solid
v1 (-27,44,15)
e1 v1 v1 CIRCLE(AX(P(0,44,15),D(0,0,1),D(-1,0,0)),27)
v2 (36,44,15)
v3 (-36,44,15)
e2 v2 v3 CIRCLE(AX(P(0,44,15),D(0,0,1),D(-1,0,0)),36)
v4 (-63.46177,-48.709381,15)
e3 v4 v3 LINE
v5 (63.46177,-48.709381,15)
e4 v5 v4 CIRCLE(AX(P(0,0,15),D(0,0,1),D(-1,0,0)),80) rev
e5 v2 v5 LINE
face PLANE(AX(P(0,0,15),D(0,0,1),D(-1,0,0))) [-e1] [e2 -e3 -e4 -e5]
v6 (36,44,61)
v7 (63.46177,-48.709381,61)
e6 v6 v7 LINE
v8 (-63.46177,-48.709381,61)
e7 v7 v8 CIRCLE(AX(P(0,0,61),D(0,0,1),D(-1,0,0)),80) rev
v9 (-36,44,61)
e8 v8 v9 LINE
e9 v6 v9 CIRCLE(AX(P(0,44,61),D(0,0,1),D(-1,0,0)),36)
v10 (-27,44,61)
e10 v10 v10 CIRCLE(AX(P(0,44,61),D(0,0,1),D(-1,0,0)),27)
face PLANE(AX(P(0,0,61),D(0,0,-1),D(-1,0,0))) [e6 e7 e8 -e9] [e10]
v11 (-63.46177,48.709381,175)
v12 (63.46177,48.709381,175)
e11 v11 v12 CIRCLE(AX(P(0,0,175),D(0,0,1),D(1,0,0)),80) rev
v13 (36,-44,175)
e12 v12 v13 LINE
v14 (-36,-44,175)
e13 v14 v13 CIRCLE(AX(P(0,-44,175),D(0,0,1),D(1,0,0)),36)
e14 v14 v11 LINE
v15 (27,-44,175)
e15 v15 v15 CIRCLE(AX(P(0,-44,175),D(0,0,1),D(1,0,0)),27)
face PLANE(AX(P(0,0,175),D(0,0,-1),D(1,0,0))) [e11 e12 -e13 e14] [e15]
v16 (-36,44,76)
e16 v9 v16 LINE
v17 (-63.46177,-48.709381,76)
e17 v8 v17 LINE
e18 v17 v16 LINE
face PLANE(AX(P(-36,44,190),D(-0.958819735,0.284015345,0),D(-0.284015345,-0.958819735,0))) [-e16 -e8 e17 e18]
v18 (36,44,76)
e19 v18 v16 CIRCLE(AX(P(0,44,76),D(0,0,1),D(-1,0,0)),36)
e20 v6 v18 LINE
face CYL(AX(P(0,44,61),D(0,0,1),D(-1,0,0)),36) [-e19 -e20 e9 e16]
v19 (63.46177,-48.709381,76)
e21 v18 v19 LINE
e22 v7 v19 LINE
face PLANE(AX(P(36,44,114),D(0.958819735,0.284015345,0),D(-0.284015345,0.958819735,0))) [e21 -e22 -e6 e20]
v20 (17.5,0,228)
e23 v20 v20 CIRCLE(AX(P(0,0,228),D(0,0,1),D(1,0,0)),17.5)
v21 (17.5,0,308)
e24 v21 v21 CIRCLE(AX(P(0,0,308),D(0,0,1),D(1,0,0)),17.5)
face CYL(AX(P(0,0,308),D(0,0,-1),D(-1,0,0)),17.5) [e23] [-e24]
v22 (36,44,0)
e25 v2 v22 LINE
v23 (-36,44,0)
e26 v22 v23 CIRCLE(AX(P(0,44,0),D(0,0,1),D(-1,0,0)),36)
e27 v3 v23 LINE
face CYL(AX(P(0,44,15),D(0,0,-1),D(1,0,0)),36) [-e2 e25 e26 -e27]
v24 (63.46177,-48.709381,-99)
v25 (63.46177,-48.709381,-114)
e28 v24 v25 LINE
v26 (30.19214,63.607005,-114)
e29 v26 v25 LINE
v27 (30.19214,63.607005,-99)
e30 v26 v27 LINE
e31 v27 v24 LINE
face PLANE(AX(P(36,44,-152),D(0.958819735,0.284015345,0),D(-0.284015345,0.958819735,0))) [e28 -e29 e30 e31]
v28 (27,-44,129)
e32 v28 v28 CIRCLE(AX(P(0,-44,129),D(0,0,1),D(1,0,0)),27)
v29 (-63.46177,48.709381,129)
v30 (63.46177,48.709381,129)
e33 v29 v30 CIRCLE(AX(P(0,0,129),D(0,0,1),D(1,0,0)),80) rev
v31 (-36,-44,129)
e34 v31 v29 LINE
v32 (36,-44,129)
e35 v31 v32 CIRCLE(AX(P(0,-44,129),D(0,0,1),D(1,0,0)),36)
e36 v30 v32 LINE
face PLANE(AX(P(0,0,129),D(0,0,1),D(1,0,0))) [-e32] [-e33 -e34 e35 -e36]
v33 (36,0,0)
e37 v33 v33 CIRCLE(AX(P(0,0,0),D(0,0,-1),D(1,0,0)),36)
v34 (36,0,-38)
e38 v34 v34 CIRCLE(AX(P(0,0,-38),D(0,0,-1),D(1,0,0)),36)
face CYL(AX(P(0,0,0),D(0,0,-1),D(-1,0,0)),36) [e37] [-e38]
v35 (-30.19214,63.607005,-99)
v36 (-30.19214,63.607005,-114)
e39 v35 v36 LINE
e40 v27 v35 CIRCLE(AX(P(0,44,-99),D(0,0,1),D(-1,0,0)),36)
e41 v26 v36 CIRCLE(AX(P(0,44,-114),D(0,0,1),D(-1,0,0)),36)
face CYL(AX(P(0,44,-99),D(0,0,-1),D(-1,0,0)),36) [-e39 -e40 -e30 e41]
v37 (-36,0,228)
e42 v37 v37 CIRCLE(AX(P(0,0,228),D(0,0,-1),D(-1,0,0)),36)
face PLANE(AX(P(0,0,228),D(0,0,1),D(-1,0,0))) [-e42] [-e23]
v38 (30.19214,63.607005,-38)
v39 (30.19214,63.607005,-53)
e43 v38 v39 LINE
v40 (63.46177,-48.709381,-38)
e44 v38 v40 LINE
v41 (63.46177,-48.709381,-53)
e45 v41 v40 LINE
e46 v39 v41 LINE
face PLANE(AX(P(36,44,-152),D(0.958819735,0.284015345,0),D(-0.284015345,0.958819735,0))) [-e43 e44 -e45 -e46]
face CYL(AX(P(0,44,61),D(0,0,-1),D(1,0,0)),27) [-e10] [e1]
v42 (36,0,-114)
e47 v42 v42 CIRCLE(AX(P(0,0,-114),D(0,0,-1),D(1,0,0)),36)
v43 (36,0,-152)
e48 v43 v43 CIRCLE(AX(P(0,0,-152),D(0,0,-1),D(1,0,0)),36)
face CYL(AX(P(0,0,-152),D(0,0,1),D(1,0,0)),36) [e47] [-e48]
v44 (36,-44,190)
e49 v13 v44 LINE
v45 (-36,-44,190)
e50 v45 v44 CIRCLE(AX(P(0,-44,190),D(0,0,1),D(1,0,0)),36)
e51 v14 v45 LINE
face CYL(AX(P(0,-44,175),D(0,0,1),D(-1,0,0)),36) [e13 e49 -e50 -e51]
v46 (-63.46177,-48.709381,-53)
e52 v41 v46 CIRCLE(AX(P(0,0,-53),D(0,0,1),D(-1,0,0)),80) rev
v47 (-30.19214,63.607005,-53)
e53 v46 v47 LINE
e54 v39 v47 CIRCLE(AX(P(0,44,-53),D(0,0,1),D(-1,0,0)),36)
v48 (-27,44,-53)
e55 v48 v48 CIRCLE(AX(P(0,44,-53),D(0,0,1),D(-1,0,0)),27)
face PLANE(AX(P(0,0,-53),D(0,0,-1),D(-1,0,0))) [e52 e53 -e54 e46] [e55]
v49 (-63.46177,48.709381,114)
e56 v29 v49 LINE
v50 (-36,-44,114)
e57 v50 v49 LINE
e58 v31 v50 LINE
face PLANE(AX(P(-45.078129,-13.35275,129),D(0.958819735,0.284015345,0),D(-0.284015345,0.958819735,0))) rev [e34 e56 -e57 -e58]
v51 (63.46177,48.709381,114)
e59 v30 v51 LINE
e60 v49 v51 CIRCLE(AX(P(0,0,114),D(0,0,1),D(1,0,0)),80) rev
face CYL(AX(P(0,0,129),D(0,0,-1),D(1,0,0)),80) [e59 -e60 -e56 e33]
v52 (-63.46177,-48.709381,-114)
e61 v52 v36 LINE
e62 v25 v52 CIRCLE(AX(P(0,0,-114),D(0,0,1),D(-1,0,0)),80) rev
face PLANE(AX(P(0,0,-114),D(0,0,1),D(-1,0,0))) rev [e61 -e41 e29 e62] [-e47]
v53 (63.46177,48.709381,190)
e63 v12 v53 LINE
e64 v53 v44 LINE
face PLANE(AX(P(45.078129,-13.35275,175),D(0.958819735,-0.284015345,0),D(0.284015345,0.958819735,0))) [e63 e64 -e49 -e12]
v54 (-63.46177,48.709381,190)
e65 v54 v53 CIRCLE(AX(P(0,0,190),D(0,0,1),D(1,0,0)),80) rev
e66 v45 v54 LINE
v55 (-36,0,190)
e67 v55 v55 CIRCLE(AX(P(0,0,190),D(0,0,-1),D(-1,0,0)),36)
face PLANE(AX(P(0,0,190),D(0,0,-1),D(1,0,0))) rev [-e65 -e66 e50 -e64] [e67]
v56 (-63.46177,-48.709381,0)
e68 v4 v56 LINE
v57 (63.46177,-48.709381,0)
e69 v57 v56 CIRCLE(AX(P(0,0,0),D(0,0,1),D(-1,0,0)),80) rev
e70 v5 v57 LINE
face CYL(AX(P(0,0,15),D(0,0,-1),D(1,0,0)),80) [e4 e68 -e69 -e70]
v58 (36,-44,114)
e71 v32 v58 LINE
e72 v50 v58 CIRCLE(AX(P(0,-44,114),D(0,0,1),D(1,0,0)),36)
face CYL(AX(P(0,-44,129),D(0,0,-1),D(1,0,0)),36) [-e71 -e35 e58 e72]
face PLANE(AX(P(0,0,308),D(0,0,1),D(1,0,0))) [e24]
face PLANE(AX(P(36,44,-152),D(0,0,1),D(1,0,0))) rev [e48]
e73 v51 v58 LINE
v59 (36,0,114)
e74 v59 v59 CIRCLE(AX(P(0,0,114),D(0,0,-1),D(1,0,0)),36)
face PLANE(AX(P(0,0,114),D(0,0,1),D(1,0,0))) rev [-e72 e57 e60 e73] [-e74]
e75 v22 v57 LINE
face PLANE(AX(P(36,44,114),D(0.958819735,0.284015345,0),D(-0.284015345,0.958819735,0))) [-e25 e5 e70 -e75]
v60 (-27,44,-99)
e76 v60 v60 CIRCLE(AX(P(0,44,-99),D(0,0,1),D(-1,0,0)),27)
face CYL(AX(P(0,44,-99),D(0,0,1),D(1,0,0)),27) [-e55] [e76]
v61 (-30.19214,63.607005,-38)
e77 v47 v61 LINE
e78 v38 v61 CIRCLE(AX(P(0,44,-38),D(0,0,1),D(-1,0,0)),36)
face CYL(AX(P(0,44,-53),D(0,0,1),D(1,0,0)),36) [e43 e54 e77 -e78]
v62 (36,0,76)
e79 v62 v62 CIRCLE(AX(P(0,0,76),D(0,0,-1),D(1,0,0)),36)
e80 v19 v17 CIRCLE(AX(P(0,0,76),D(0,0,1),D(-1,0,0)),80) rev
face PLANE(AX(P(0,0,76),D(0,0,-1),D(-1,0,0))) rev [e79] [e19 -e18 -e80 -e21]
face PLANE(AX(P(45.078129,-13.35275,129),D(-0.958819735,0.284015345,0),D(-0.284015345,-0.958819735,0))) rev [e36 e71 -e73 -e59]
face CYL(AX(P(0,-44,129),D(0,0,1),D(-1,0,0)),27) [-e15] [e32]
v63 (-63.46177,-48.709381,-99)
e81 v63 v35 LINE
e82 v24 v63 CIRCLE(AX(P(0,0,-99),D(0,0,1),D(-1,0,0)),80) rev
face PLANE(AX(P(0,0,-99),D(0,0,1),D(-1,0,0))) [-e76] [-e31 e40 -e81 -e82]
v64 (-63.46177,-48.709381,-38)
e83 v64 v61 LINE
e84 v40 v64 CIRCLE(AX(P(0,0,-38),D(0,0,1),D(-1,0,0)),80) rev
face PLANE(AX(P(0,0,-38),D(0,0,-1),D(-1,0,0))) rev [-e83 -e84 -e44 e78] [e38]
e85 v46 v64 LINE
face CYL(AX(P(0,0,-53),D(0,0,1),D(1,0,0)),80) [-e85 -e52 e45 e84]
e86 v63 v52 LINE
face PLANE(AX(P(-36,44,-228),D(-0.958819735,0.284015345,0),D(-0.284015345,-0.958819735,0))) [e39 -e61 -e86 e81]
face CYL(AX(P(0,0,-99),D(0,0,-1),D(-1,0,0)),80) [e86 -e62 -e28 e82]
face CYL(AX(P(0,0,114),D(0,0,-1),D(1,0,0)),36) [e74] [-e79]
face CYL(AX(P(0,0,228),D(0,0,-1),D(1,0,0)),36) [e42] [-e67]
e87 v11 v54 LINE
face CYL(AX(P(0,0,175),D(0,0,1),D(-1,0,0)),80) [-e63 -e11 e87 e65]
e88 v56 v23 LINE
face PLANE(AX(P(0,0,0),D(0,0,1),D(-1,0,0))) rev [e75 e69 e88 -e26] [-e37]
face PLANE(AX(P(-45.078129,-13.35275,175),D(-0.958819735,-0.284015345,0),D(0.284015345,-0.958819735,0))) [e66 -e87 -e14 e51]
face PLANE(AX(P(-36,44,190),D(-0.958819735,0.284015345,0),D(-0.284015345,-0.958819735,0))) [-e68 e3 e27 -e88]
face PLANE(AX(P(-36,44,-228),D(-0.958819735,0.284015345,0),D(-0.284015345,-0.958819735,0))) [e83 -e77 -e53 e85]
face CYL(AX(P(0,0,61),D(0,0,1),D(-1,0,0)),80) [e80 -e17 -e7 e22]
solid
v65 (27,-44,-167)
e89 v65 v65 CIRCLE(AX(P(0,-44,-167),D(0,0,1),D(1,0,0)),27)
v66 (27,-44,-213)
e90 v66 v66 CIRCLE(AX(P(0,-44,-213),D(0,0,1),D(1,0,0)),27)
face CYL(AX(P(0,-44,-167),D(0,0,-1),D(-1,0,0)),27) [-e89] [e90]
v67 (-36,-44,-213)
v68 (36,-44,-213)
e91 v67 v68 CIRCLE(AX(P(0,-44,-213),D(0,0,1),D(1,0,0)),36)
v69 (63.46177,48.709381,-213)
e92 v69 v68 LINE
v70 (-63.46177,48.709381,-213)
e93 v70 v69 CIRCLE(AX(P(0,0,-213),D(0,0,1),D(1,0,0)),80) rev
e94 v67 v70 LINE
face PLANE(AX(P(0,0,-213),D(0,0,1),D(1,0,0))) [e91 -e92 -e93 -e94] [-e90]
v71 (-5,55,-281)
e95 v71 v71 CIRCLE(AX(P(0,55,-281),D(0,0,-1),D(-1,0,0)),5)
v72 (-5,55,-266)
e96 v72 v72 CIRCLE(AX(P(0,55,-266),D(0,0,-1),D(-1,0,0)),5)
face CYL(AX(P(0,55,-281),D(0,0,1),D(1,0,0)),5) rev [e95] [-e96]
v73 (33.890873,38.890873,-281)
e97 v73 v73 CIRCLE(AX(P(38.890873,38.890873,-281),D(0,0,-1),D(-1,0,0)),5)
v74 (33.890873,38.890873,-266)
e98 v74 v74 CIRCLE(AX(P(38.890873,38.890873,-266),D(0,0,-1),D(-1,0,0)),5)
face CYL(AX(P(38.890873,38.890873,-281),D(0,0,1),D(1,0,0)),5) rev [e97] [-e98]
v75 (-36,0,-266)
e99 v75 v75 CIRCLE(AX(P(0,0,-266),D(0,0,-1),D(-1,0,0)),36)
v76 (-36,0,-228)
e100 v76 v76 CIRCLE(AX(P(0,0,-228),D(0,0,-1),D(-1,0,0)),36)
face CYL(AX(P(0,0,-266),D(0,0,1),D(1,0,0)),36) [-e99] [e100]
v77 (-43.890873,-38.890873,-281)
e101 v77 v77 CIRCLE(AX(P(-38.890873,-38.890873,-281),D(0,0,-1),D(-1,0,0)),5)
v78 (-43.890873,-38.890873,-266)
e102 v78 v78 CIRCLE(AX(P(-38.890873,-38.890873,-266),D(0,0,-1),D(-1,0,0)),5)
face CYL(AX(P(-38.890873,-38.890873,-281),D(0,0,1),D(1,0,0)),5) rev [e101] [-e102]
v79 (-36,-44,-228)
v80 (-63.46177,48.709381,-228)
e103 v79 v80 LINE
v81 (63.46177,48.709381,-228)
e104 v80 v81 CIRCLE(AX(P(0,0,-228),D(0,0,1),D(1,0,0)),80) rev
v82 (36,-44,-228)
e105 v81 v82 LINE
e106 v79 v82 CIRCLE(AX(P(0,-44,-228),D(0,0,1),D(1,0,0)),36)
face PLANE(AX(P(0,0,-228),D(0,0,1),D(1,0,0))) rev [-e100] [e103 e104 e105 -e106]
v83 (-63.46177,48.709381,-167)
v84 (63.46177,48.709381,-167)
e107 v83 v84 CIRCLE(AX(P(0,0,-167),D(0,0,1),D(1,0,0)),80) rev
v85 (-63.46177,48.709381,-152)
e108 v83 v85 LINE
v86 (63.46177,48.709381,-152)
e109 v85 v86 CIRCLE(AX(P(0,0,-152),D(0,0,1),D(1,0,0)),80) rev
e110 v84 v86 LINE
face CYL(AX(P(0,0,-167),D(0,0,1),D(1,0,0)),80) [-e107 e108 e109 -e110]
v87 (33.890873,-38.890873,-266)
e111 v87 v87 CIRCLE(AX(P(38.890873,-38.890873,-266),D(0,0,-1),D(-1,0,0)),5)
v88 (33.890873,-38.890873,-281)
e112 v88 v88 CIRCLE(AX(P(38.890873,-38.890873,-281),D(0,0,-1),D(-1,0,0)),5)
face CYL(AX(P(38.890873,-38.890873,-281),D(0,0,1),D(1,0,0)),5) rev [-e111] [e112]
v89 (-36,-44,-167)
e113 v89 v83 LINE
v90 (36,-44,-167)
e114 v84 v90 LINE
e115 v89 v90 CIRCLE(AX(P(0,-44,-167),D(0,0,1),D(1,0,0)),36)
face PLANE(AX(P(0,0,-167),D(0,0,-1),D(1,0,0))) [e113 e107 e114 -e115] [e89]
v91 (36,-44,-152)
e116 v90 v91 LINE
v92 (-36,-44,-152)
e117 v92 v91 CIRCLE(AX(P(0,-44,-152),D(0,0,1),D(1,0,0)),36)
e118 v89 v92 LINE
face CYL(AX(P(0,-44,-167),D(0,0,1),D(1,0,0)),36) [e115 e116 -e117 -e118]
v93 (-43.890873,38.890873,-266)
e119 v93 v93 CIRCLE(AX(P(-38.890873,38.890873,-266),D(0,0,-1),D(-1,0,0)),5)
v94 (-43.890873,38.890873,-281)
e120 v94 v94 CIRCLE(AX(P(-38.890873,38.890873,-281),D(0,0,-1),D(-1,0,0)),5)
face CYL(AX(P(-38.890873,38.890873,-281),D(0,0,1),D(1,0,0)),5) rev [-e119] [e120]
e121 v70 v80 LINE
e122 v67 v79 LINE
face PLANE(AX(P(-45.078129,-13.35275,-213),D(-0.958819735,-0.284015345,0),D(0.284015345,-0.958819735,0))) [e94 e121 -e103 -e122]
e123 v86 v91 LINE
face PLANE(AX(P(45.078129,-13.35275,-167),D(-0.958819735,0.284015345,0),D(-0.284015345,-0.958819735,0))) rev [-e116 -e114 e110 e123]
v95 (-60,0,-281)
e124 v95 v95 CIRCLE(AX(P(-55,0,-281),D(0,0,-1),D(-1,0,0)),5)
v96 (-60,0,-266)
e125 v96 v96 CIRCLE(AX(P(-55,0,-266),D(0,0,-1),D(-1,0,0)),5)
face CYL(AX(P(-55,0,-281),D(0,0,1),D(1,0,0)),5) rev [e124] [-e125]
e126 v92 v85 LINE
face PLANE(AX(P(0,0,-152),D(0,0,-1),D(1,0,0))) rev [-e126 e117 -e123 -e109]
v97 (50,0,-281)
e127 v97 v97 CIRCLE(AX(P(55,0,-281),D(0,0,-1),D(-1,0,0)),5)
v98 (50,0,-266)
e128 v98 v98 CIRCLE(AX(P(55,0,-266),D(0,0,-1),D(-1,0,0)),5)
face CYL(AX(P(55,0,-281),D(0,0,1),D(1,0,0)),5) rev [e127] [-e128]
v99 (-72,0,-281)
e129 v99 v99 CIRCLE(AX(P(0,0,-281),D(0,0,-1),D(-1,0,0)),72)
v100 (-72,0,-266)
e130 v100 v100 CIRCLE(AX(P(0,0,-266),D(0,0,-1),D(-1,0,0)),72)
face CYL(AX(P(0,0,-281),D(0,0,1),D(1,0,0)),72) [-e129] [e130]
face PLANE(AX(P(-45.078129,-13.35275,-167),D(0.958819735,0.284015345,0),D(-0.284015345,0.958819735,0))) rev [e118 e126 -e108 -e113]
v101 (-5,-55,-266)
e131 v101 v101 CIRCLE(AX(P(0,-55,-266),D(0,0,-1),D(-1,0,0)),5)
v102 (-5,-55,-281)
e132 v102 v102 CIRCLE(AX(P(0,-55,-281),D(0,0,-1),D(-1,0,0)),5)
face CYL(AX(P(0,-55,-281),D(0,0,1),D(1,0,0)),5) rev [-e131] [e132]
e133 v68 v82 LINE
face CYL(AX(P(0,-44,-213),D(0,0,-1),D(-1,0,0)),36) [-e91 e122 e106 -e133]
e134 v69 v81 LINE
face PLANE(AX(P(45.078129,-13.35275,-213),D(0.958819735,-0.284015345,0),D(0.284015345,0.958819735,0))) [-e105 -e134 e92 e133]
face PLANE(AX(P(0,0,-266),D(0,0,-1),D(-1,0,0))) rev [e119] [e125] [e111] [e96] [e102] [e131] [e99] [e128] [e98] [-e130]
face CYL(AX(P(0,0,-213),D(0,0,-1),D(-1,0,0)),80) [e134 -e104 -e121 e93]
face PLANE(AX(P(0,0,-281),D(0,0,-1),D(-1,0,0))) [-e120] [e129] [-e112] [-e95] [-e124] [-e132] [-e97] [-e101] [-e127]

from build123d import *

# Parameters (mm, degrees)
BOSS_EXTRUDE1_DEPTH   = 15
SKETCH2_R             = 27
BOSS_EXTRUDE2_DEPTH   = 46
SKETCH3_R             = 36
BOSS_EXTRUDE3_DEPTH   = 38
SPLIT1_START          = 175
SPLIT1_OUTLINE_R      = 36
SPLIT1_DEPTH          = 53
SPLIT1_START_2        = 114
SPLIT1_2_DEPTH        = 15
SPLIT1_3_OUTLINE_R    = 36
SPLIT1_3_DEPTH        = 15
SPLIT1_START_3        = 129
SPLIT1_4_OUTLINE_R    = 27
SPLIT1_4_DEPTH        = 46
SPLIT1_5_DEPTH        = 114
SPLIT1_6_DEPTH        = 76
SPLIT1_7_DEPTH        = 15
SPLIT1_START_4        = 61
SPLIT1_8_DEPTH        = 15
SPLIT1_9_DEPTH        = 15
SPLIT1_10_DEPTH       = 15
BODY_MOVE_COPY2_ANGLE = 180
SKETCH4_R             = 17.5
BOSS_EXTRUDE4_DEPTH   = 80
SKETCH5_R             = 72
SKETCH5_R_2           = 5
BOSS_EXTRUDE5_DEPTH   = 15


# Read off the part's stored shape, not the designer's step: Split1
with BuildPart() as part:
    # Sketch1 → Boss-Extrude1 (new body)
    with BuildSketch(Plane.XY):
        with BuildLine():
            Line((-63.461769721, 48.709380861), (-36, -44))
            ThreePointArc((-36, -44), (0, -80), (36, -44))
            Line((36, -44), (63.461769721, 48.709380861))
            ThreePointArc((63.461769721, 48.709380861), (0, 80), (-63.461769721, 48.709380861))
        make_face()
    boss_extrude1 = extrude(amount=BOSS_EXTRUDE1_DEPTH)

    # Sketch2 → Boss-Extrude2 (add)
    with BuildSketch(Plane.XY.offset(15)):
        with Locations((0, -44)):
            Circle(SKETCH2_R)
    extrude(amount=BOSS_EXTRUDE2_DEPTH)

    # Sketch3 → Boss-Extrude3 (add)
    with BuildSketch(Plane(origin=(0, 0, 0), x_dir=(-1, 0, 0), z_dir=(0, 0, -1))):
        Circle(SKETCH3_R)
    boss_extrude3 = extrude(amount=BOSS_EXTRUDE3_DEPTH)

    # Mirror1: Boss-Extrude1, Boss-Extrude3 across plane
    add(boss_extrude1.mirror(Plane.XY.offset(38)))
    add(boss_extrude3.mirror(Plane.XY.offset(38)))

    # Mirror7: part across plane


with BuildPart() as part_1:
    add(part.part)
    add(part.part.mirror(Plane.XY.offset(95)))

    # Split1 5 outline → Split1 5 (cut)
    with BuildSketch(Plane.XY.offset(SPLIT1_START_2)):
        with BuildLine():
            Line((36, -44), (63.461769721, 48.709380861))
            ThreePointArc((63.461769721, 48.709380861), (0, 80), (-63.461769721, 48.709380861))
            Line((-63.461769721, 48.709380861), (-36, -44))
            ThreePointArc((-36, -44), (0, -80), (36, -44))
        make_face()
    extrude(amount=SPLIT1_5_DEPTH, mode=Mode.SUBTRACT)

    # Split1 6 outline → Split1 6 (cut)
    with BuildSketch(Plane.XY):
        with BuildLine():
            Line((36, -44), (30.192140446, -63.607005261))
            ThreePointArc((30.192140446, -63.607005261), (34.517510455, -54.22455241), (36, -44))
        make_face()
        with BuildLine():
            ThreePointArc((-36, -44), (-34.517510455, -54.22455241), (-30.192140446, -63.607005261))
            Line((-30.192140446, -63.607005261), (-36, -44))
        make_face()
    extrude(amount=SPLIT1_6_DEPTH, mode=Mode.SUBTRACT)


with BuildPart() as body_2:
    # Split1 outline → Split1 (new body)
    with BuildSketch(Plane.XY.offset(SPLIT1_START)):
        Circle(SPLIT1_OUTLINE_R)
    extrude(amount=SPLIT1_DEPTH)

    # Split1 2 outline → Split1 2 (add)
    with BuildSketch(Plane.XY.offset(SPLIT1_START_2)):
        with BuildLine():
            ThreePointArc((-36, -44), (0, -80), (36, -44))
            Line((36, -44), (63.461769721, 48.709380861))
            ThreePointArc((63.461769721, 48.709380861), (0, 80), (-63.461769721, 48.709380861))
            Line((-63.461769721, 48.709380861), (-36, -44))
        make_face()
    extrude(amount=SPLIT1_2_DEPTH)

    # Split1 3 outline → Split1 3 (add)
    with BuildSketch(Plane.XY.offset(SPLIT1_START)):
        with BuildLine():
            ThreePointArc((-36, -44), (0, -80), (36, -44))
            Line((36, -44), (63.461769721, 48.709380861))
            ThreePointArc((63.461769721, 48.709380861), (0, 80), (-63.461769721, 48.709380861))
            Line((-63.461769721, 48.709380861), (-36, -44))
        make_face()
        Circle(SPLIT1_3_OUTLINE_R, mode=Mode.SUBTRACT)
    extrude(amount=SPLIT1_3_DEPTH)

    # Split1 4 outline → Split1 4 (add)
    with BuildSketch(Plane.XY.offset(SPLIT1_START_3)):
        with Locations((0, -44)):
            Circle(SPLIT1_4_OUTLINE_R)
    extrude(amount=SPLIT1_4_DEPTH)


with BuildPart() as body_3:
    # Split1 7 outline → Split1 7 (new body)
    with BuildSketch(Plane.XY):
        with BuildLine():
            Line((36, -44), (30.192140446, -63.607005261))
            ThreePointArc((30.192140446, -63.607005261), (34.517510455, -54.224552409), (36, -44))
        make_face()
    extrude(amount=SPLIT1_7_DEPTH)


with BuildPart() as body_4:
    # Split1 8 outline → Split1 8 (new body)
    with BuildSketch(Plane.XY.offset(SPLIT1_START_4)):
        with BuildLine():
            Line((-30.192140446, -63.607005261), (-36, -44))
            ThreePointArc((-36, -44), (-34.517510455, -54.224552409), (-30.192140446, -63.607005261))
        make_face()
    extrude(amount=SPLIT1_8_DEPTH)


with BuildPart() as body_5:
    # Split1 9 outline → Split1 9 (new body)
    with BuildSketch(Plane.XY.offset(SPLIT1_START_4)):
        with BuildLine():
            Line((36, -44), (30.192140446, -63.607005261))
            ThreePointArc((30.192140446, -63.607005261), (34.517510455, -54.224552409), (36, -44))
        make_face()
    extrude(amount=SPLIT1_9_DEPTH)


with BuildPart() as body_6:
    # Split1 10 outline → Split1 10 (new body)
    with BuildSketch(Plane.XY):
        with BuildLine():
            Line((-30.192140446, -63.607005261), (-36, -44))
            ThreePointArc((-36, -44), (-34.517510455, -54.224552409), (-30.192140446, -63.607005261))
        make_face()
    extrude(amount=SPLIT1_10_DEPTH)


with BuildPart() as body_6_1:
    # Body-Move/Copy2: moved
    add(body_6.part.rotate(Axis((0, 0, 0), (0, 0, 1)), BODY_MOVE_COPY2_ANGLE))


with BuildPart() as body_5_1:
    # Body-Move/Copy2: moved
    add(body_5.part.rotate(Axis((0, 0, 0), (0, 0, 1)), BODY_MOVE_COPY2_ANGLE))


with BuildPart() as body_4_1:
    # Body-Move/Copy2: moved
    add(body_4.part.rotate(Axis((0, 0, 0), (0, 0, 1)), BODY_MOVE_COPY2_ANGLE))


with BuildPart() as body_3_1:
    # Body-Move/Copy2: moved
    add(body_3.part.rotate(Axis((0, 0, 0), (0, 0, 1)), BODY_MOVE_COPY2_ANGLE))


with BuildPart() as part_2:
    # Body-Move/Copy2: moved
    add(part_1.part.rotate(Axis((0, 0, 0), (0, 0, 1)), BODY_MOVE_COPY2_ANGLE))


with BuildPart() as body_7:
    # Mirror8: mirrored copy
    add(part_2.part.mirror(Plane(origin=(0, 0, -19), x_dir=(1, 0, 0), z_dir=(0, 0, -1))))


with BuildPart() as body_8:
    # Mirror8 2: mirrored copy
    add(body_2.part.mirror(Plane(origin=(0, 0, -19), x_dir=(1, 0, 0), z_dir=(0, 0, -1))))

    # Sketch5 → Boss-Extrude5 (add)
    with BuildSketch(Plane(origin=(0, 0, -266), x_dir=(-1, 0, 0), z_dir=(0, 0, -1))):
        Circle(SKETCH5_R)
        with Locations((0, 55)):
            Circle(SKETCH5_R_2, mode=Mode.SUBTRACT)
        with Locations((38.890872965, 38.890872965)):
            Circle(SKETCH5_R_2, mode=Mode.SUBTRACT)
        with Locations((55, 0)):
            Circle(SKETCH5_R_2, mode=Mode.SUBTRACT)
        with Locations((38.890872965, -38.890872965)):
            Circle(SKETCH5_R_2, mode=Mode.SUBTRACT)
        with Locations((0, -55)):
            Circle(SKETCH5_R_2, mode=Mode.SUBTRACT)
        with Locations((-38.890872965, -38.890872965)):
            Circle(SKETCH5_R_2, mode=Mode.SUBTRACT)
        with Locations((-55, 0)):
            Circle(SKETCH5_R_2, mode=Mode.SUBTRACT)
        with Locations((-38.890872965, 38.890872965)):
            Circle(SKETCH5_R_2, mode=Mode.SUBTRACT)
    extrude(amount=BOSS_EXTRUDE5_DEPTH)


with BuildPart() as body_2_1:
    add(body_2.part)

    # Sketch4 → Boss-Extrude4 (add)
    with BuildSketch(Plane.XY.offset(228)):
        Circle(SKETCH4_R)
    extrude(amount=BOSS_EXTRUDE4_DEPTH)


with BuildPart() as body_7_1:
    add(body_7.part)

    # Combine2: union part, body 2, body 6, body 4, body 3, body 5
    add(part_2.part)
    add(body_2_1.part)
    add(body_6_1.part)
    add(body_4_1.part)
    add(body_3_1.part)
    add(body_5_1.part)


solid = Compound([body_8.part, body_7_1.part])
